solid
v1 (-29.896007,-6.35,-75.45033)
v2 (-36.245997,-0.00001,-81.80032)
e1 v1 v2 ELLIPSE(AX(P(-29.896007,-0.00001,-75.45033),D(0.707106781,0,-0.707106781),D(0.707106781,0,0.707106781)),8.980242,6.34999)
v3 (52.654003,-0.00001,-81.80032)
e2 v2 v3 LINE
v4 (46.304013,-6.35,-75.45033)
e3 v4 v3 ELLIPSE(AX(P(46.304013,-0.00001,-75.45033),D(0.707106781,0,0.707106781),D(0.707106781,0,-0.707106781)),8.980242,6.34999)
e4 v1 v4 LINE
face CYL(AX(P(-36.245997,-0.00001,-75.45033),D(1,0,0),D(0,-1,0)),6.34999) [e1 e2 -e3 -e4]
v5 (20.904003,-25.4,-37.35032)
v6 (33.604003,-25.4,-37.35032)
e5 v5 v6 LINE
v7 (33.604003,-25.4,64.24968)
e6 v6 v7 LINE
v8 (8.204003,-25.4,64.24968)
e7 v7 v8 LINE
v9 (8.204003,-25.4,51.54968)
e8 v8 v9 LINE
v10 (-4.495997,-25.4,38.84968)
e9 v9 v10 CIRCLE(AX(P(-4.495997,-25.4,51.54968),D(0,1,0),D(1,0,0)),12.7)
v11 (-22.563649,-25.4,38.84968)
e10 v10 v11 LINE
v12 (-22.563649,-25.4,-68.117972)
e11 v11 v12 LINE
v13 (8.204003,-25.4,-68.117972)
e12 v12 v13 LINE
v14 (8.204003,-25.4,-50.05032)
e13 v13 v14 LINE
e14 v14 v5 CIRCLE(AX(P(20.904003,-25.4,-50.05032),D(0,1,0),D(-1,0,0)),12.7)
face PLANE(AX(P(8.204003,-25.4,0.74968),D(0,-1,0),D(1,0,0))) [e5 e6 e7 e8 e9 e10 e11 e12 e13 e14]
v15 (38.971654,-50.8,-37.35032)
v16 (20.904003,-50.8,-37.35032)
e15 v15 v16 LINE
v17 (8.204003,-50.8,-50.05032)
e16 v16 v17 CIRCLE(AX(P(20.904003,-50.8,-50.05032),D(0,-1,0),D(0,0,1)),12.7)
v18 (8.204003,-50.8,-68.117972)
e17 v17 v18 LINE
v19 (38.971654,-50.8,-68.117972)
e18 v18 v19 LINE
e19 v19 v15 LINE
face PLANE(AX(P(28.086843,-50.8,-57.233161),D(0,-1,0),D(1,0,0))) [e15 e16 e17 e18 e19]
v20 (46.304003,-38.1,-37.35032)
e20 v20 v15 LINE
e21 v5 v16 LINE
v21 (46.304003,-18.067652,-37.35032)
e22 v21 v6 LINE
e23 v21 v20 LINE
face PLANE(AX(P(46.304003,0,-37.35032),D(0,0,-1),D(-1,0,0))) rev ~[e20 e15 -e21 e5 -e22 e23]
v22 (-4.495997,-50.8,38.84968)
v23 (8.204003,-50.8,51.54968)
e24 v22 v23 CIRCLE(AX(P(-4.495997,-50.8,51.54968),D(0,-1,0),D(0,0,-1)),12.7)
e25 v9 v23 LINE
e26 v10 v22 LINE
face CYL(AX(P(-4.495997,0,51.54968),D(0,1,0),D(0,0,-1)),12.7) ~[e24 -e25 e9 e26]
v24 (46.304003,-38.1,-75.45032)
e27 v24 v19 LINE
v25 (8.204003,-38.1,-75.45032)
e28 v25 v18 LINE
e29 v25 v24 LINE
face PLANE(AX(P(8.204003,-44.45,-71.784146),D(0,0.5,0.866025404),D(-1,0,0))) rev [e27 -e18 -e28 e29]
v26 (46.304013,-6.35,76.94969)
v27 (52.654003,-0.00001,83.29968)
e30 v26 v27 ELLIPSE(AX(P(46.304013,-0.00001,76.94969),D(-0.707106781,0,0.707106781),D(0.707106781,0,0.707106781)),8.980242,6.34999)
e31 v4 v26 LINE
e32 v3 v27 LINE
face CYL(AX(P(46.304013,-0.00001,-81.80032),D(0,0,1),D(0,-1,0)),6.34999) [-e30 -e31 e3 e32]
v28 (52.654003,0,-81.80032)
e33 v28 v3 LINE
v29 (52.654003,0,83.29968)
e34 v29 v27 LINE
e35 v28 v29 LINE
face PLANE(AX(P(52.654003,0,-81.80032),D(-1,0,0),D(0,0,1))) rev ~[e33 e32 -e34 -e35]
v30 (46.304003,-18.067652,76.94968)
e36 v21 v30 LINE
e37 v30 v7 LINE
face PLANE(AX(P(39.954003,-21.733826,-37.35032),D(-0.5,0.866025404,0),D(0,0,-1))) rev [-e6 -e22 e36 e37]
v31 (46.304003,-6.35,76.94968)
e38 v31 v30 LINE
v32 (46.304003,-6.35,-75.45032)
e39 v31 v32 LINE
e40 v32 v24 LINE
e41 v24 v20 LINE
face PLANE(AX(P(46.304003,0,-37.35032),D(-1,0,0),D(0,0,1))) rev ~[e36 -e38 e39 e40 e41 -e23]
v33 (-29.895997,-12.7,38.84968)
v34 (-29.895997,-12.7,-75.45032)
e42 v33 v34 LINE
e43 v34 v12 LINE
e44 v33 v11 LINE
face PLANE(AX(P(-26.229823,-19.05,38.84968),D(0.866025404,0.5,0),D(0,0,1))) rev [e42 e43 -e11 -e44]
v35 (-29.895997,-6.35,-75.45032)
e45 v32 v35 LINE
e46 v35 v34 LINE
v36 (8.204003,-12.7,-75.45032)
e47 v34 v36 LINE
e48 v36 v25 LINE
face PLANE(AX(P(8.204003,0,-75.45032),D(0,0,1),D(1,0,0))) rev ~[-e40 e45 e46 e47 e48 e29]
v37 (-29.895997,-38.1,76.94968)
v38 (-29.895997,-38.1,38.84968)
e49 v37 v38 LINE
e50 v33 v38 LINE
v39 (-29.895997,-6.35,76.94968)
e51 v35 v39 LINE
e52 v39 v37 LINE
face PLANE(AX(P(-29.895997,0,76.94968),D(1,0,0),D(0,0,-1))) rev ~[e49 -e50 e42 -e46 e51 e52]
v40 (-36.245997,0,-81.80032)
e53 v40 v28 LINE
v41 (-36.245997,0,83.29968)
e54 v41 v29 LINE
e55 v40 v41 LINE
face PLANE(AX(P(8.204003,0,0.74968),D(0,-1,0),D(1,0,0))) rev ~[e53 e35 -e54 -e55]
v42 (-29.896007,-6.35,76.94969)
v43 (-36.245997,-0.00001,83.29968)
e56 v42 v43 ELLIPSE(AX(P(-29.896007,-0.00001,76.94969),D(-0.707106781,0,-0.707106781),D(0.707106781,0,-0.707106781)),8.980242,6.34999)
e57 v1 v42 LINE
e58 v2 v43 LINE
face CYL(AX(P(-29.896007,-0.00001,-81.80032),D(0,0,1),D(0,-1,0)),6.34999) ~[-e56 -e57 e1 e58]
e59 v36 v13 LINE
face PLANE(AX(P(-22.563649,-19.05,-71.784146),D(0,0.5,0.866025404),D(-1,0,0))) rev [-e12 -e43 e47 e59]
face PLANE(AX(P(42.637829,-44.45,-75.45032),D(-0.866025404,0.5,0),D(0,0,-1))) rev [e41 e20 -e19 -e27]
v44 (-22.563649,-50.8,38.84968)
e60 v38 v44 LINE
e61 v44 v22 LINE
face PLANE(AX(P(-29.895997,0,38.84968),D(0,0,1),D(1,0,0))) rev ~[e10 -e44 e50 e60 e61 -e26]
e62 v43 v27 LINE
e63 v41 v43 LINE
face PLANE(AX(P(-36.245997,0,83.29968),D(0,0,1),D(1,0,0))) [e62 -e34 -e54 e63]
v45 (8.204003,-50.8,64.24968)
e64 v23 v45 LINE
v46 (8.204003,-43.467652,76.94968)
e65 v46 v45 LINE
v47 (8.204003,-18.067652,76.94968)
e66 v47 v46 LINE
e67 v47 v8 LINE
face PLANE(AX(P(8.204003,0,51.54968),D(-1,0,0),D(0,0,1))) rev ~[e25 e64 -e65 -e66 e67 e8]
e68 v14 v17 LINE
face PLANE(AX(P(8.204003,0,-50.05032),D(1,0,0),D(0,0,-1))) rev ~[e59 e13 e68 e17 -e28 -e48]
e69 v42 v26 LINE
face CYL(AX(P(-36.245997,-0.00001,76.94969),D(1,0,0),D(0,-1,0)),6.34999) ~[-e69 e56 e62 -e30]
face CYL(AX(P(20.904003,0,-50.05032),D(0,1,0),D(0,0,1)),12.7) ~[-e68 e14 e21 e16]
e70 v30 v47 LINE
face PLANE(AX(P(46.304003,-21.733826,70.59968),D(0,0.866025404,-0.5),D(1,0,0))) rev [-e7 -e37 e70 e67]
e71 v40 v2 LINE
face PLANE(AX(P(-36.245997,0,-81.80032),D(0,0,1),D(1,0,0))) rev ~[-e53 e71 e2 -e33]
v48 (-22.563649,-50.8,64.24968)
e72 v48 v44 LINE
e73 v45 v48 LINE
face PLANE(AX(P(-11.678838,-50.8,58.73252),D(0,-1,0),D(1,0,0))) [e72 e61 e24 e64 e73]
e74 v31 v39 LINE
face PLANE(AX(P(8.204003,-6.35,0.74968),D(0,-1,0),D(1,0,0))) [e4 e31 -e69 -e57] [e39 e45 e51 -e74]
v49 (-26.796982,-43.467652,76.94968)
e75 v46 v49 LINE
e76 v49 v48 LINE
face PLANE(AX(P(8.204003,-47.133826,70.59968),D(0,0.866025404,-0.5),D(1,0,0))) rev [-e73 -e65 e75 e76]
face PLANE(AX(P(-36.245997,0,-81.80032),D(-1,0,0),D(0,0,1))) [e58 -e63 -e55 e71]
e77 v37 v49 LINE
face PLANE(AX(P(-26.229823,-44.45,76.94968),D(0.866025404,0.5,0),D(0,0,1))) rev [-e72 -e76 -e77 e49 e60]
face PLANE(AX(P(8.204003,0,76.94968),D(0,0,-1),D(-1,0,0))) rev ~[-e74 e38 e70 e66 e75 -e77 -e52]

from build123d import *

# Parameters (mm, degrees)
F0_W        = 88.9
F0_H        = 165.1
F1_DEPTH    = 6.35
F2_DEPTH    = 25.4
F3_DEPTH    = 50.8
F4_R        = 6.34999
F5_C1_SIZE2 = 7.3323484187
F5_C1_SIZE  = 12.7
F5_C2_SIZE2 = 7.3323484187
F5_C2_SIZE  = 12.7
F5_C3_SIZE2 = 12.7
F5_C3_SIZE  = 7.3323484187
F5_C4_SIZE2 = 12.7
F5_C4_SIZE  = 7.3323484187
F5_C5_SIZE2 = 7.3323484187
F5_C5_SIZE  = 12.7
F5_C6_SIZE2 = 12.7
F5_C6_SIZE  = 7.3323484187
F5_C7_SIZE2 = 7.3323484187
F5_C7_SIZE  = 12.7
F5_C8_SIZE2 = 7.3323484187
F5_C8_SIZE  = 12.7


# Not quite as in the source:
# - a fillet or chamfer is up to 0.001 mm smaller than in the source, because OpenCascade refuses the exact size


with BuildPart() as f1:
    # F0 (on Front) → F1 (new body)
    with BuildSketch(Plane.XZ):
        with Locations((8.2040027817, 0.7496795987)):
            Rectangle(F0_W, F0_H)
        Polygon((-29.8959972183, 38.8496795987), (-29.8959972183, 76.9496795987), (8.2040027817, 76.9496795987), (46.3040027817, 76.9496795987), (46.3040027817, -37.3503204013), (46.3040027817, -75.4503204013), (8.2040027817, -75.4503204013), (-29.8959972183, -75.4503204013), align=None, mode=Mode.SUBTRACT)
    extrude(amount=F1_DEPTH)

    # F0 (on Front) → F2 (join)
    with BuildSketch(Plane.XZ):
        with BuildLine():
            Line((46.3040027817, 76.9496795987), (8.2040027817, 76.9496795987))
            Line((8.2040027817, 76.9496795987), (8.2040027817, 51.5496795987))
            ThreePointArc((8.2040027817, 51.5496795987), (4.4842589027, 42.5694234776), (-4.4959972183, 38.8496795987))
            Line((-4.4959972183, 38.8496795987), (-29.8959972183, 38.8496795987))
            Line((-29.8959972183, 38.8496795987), (-29.8959972183, -75.4503204013))
            Line((-29.8959972183, -75.4503204013), (8.2040027817, -75.4503204013))
            Line((8.2040027817, -75.4503204013), (8.2040027817, -50.0503204013))
            ThreePointArc((8.2040027817, -50.0503204013), (11.9237466606, -41.0700642803), (20.9040027817, -37.3503204013))
            Line((20.9040027817, -37.3503204013), (46.3040027817, -37.3503204013))
            Line((46.3040027817, -37.3503204013), (46.3040027817, 76.9496795987))
        make_face()
    extrude(amount=F2_DEPTH)

    # F0 (on Front) → F3 (join)
    with BuildSketch(Plane.XZ):
        with BuildLine():
            Line((8.2040027817, 76.9496795987), (-29.8959972183, 76.9496795987))
            Line((-29.8959972183, 76.9496795987), (-29.8959972183, 38.8496795987))
            Line((-29.8959972183, 38.8496795987), (-4.4959972183, 38.8496795987))
            ThreePointArc((-4.4959972183, 38.8496795987), (4.4842589027, 42.5694234776), (8.2040027817, 51.5496795987))
            Line((8.2040027817, 51.5496795987), (8.2040027817, 76.9496795987))
        make_face()
        with BuildLine():
            Line((46.3040027817, -75.4503204013), (46.3040027817, -37.3503204013))
            Line((46.3040027817, -37.3503204013), (20.9040027817, -37.3503204013))
            ThreePointArc((20.9040027817, -37.3503204013), (11.9237466606, -41.0700642803), (8.2040027817, -50.0503204013))
            Line((8.2040027817, -50.0503204013), (8.2040027817, -75.4503204013))
            Line((8.2040027817, -75.4503204013), (46.3040027817, -75.4503204013))
        make_face()
    extrude(amount=F3_DEPTH)

    # F4 (radius 6.35 in the source; OpenCascade refuses exactly that, so slightly less here)
    f4_edges = [f1.edges().sort_by_distance(p)[0] for p in [
        (8.204003, -6.35, 83.29968),
        (-36.245997, -6.35, 0.74968),
        (8.204003, -6.35, -81.80032),
        (52.654003, -6.35, 0.74968),
    ]]
    fillet(f4_edges, radius=F4_R)

    # F5: chamfer of 12.7 x 7.3323484187 on 8 edges, made by hand

    # F5_c1
    f5_c1_edges = [f1.edges().sort_by_distance(p)[0] for p in [
        (-29.8959972183, -50.8, 57.8996795987),
    ]]
    f5_c1_side = f1.faces().sort_by_distance((-29.8959972183, -50.6533530316, 57.8996795987))[0]
    chamfer(f5_c1_edges, length=F5_C1_SIZE, length2=F5_C1_SIZE2, reference=f5_c1_side)

    # F5_c2
    f5_c2_edges = [f1.edges().sort_by_distance(p)[0] for p in [
        (-29.8959972183, -25.4, -18.3003204013),
    ]]
    f5_c2_side = f1.faces().sort_by_distance((-29.8959972183, -25.2533530316, -18.3003204013))[0]
    chamfer(f5_c2_edges, length=F5_C2_SIZE, length2=F5_C2_SIZE2, reference=f5_c2_side)

    # F5_c3
    f5_c3_edges = [f1.edges().sort_by_distance(p)[0] for p in [
        (27.2540027817, -25.4, 76.9496795987),
    ]]
    f5_c3_side = f1.faces().sort_by_distance((27.2540027817, -25.2533530316, 76.9496795987))[0]
    chamfer(f5_c3_edges, length=F5_C3_SIZE, length2=F5_C3_SIZE2, reference=f5_c3_side)

    # F5_c4
    f5_c4_edges = [f1.edges().sort_by_distance(p)[0] for p in [
        (-7.179823009, -50.8, 76.9496795987),
    ]]
    f5_c4_side = f1.faces().sort_by_distance((-7.179823009, -50.6533530316, 76.9496795987))[0]
    chamfer(f5_c4_edges, length=F5_C4_SIZE, length2=F5_C4_SIZE2, reference=f5_c4_side)

    # F5_c5
    f5_c5_edges = [f1.edges().sort_by_distance(p)[0] for p in [
        (46.3040027817, -50.8, -56.4003204013),
    ]]
    f5_c5_side = f1.faces().sort_by_distance((46.3040027817, -50.6533530316, -56.4003204013))[0]
    chamfer(f5_c5_edges, length=F5_C5_SIZE, length2=F5_C5_SIZE2, reference=f5_c5_side)

    # F5_c6
    f5_c6_edges = [f1.edges().sort_by_distance(p)[0] for p in [
        (46.3040027817, -25.4, 13.4496795987),
    ]]
    f5_c6_side = f1.faces().sort_by_distance((46.3040027817, -25.2533530316, 13.4496795987))[0]
    chamfer(f5_c6_edges, length=F5_C6_SIZE, length2=F5_C6_SIZE2, reference=f5_c6_side)

    # F5_c7
    f5_c7_edges = [f1.edges().sort_by_distance(p)[0] for p in [
        (-7.179823009, -25.4, -75.4503204013),
    ]]
    f5_c7_side = f1.faces().sort_by_distance((-7.179823009, -25.2533530316, -75.4503204013))[0]
    chamfer(f5_c7_edges, length=F5_C7_SIZE, length2=F5_C7_SIZE2, reference=f5_c7_side)

    # F5_c8
    f5_c8_edges = [f1.edges().sort_by_distance(p)[0] for p in [
        (23.5878285723, -50.8, -75.4503204013),
    ]]
    f5_c8_side = f1.faces().sort_by_distance((23.5878285723, -50.6533530316, -75.4503204013))[0]
    chamfer(f5_c8_edges, length=F5_C8_SIZE, length2=F5_C8_SIZE2, reference=f5_c8_side)


solid = f1.part
